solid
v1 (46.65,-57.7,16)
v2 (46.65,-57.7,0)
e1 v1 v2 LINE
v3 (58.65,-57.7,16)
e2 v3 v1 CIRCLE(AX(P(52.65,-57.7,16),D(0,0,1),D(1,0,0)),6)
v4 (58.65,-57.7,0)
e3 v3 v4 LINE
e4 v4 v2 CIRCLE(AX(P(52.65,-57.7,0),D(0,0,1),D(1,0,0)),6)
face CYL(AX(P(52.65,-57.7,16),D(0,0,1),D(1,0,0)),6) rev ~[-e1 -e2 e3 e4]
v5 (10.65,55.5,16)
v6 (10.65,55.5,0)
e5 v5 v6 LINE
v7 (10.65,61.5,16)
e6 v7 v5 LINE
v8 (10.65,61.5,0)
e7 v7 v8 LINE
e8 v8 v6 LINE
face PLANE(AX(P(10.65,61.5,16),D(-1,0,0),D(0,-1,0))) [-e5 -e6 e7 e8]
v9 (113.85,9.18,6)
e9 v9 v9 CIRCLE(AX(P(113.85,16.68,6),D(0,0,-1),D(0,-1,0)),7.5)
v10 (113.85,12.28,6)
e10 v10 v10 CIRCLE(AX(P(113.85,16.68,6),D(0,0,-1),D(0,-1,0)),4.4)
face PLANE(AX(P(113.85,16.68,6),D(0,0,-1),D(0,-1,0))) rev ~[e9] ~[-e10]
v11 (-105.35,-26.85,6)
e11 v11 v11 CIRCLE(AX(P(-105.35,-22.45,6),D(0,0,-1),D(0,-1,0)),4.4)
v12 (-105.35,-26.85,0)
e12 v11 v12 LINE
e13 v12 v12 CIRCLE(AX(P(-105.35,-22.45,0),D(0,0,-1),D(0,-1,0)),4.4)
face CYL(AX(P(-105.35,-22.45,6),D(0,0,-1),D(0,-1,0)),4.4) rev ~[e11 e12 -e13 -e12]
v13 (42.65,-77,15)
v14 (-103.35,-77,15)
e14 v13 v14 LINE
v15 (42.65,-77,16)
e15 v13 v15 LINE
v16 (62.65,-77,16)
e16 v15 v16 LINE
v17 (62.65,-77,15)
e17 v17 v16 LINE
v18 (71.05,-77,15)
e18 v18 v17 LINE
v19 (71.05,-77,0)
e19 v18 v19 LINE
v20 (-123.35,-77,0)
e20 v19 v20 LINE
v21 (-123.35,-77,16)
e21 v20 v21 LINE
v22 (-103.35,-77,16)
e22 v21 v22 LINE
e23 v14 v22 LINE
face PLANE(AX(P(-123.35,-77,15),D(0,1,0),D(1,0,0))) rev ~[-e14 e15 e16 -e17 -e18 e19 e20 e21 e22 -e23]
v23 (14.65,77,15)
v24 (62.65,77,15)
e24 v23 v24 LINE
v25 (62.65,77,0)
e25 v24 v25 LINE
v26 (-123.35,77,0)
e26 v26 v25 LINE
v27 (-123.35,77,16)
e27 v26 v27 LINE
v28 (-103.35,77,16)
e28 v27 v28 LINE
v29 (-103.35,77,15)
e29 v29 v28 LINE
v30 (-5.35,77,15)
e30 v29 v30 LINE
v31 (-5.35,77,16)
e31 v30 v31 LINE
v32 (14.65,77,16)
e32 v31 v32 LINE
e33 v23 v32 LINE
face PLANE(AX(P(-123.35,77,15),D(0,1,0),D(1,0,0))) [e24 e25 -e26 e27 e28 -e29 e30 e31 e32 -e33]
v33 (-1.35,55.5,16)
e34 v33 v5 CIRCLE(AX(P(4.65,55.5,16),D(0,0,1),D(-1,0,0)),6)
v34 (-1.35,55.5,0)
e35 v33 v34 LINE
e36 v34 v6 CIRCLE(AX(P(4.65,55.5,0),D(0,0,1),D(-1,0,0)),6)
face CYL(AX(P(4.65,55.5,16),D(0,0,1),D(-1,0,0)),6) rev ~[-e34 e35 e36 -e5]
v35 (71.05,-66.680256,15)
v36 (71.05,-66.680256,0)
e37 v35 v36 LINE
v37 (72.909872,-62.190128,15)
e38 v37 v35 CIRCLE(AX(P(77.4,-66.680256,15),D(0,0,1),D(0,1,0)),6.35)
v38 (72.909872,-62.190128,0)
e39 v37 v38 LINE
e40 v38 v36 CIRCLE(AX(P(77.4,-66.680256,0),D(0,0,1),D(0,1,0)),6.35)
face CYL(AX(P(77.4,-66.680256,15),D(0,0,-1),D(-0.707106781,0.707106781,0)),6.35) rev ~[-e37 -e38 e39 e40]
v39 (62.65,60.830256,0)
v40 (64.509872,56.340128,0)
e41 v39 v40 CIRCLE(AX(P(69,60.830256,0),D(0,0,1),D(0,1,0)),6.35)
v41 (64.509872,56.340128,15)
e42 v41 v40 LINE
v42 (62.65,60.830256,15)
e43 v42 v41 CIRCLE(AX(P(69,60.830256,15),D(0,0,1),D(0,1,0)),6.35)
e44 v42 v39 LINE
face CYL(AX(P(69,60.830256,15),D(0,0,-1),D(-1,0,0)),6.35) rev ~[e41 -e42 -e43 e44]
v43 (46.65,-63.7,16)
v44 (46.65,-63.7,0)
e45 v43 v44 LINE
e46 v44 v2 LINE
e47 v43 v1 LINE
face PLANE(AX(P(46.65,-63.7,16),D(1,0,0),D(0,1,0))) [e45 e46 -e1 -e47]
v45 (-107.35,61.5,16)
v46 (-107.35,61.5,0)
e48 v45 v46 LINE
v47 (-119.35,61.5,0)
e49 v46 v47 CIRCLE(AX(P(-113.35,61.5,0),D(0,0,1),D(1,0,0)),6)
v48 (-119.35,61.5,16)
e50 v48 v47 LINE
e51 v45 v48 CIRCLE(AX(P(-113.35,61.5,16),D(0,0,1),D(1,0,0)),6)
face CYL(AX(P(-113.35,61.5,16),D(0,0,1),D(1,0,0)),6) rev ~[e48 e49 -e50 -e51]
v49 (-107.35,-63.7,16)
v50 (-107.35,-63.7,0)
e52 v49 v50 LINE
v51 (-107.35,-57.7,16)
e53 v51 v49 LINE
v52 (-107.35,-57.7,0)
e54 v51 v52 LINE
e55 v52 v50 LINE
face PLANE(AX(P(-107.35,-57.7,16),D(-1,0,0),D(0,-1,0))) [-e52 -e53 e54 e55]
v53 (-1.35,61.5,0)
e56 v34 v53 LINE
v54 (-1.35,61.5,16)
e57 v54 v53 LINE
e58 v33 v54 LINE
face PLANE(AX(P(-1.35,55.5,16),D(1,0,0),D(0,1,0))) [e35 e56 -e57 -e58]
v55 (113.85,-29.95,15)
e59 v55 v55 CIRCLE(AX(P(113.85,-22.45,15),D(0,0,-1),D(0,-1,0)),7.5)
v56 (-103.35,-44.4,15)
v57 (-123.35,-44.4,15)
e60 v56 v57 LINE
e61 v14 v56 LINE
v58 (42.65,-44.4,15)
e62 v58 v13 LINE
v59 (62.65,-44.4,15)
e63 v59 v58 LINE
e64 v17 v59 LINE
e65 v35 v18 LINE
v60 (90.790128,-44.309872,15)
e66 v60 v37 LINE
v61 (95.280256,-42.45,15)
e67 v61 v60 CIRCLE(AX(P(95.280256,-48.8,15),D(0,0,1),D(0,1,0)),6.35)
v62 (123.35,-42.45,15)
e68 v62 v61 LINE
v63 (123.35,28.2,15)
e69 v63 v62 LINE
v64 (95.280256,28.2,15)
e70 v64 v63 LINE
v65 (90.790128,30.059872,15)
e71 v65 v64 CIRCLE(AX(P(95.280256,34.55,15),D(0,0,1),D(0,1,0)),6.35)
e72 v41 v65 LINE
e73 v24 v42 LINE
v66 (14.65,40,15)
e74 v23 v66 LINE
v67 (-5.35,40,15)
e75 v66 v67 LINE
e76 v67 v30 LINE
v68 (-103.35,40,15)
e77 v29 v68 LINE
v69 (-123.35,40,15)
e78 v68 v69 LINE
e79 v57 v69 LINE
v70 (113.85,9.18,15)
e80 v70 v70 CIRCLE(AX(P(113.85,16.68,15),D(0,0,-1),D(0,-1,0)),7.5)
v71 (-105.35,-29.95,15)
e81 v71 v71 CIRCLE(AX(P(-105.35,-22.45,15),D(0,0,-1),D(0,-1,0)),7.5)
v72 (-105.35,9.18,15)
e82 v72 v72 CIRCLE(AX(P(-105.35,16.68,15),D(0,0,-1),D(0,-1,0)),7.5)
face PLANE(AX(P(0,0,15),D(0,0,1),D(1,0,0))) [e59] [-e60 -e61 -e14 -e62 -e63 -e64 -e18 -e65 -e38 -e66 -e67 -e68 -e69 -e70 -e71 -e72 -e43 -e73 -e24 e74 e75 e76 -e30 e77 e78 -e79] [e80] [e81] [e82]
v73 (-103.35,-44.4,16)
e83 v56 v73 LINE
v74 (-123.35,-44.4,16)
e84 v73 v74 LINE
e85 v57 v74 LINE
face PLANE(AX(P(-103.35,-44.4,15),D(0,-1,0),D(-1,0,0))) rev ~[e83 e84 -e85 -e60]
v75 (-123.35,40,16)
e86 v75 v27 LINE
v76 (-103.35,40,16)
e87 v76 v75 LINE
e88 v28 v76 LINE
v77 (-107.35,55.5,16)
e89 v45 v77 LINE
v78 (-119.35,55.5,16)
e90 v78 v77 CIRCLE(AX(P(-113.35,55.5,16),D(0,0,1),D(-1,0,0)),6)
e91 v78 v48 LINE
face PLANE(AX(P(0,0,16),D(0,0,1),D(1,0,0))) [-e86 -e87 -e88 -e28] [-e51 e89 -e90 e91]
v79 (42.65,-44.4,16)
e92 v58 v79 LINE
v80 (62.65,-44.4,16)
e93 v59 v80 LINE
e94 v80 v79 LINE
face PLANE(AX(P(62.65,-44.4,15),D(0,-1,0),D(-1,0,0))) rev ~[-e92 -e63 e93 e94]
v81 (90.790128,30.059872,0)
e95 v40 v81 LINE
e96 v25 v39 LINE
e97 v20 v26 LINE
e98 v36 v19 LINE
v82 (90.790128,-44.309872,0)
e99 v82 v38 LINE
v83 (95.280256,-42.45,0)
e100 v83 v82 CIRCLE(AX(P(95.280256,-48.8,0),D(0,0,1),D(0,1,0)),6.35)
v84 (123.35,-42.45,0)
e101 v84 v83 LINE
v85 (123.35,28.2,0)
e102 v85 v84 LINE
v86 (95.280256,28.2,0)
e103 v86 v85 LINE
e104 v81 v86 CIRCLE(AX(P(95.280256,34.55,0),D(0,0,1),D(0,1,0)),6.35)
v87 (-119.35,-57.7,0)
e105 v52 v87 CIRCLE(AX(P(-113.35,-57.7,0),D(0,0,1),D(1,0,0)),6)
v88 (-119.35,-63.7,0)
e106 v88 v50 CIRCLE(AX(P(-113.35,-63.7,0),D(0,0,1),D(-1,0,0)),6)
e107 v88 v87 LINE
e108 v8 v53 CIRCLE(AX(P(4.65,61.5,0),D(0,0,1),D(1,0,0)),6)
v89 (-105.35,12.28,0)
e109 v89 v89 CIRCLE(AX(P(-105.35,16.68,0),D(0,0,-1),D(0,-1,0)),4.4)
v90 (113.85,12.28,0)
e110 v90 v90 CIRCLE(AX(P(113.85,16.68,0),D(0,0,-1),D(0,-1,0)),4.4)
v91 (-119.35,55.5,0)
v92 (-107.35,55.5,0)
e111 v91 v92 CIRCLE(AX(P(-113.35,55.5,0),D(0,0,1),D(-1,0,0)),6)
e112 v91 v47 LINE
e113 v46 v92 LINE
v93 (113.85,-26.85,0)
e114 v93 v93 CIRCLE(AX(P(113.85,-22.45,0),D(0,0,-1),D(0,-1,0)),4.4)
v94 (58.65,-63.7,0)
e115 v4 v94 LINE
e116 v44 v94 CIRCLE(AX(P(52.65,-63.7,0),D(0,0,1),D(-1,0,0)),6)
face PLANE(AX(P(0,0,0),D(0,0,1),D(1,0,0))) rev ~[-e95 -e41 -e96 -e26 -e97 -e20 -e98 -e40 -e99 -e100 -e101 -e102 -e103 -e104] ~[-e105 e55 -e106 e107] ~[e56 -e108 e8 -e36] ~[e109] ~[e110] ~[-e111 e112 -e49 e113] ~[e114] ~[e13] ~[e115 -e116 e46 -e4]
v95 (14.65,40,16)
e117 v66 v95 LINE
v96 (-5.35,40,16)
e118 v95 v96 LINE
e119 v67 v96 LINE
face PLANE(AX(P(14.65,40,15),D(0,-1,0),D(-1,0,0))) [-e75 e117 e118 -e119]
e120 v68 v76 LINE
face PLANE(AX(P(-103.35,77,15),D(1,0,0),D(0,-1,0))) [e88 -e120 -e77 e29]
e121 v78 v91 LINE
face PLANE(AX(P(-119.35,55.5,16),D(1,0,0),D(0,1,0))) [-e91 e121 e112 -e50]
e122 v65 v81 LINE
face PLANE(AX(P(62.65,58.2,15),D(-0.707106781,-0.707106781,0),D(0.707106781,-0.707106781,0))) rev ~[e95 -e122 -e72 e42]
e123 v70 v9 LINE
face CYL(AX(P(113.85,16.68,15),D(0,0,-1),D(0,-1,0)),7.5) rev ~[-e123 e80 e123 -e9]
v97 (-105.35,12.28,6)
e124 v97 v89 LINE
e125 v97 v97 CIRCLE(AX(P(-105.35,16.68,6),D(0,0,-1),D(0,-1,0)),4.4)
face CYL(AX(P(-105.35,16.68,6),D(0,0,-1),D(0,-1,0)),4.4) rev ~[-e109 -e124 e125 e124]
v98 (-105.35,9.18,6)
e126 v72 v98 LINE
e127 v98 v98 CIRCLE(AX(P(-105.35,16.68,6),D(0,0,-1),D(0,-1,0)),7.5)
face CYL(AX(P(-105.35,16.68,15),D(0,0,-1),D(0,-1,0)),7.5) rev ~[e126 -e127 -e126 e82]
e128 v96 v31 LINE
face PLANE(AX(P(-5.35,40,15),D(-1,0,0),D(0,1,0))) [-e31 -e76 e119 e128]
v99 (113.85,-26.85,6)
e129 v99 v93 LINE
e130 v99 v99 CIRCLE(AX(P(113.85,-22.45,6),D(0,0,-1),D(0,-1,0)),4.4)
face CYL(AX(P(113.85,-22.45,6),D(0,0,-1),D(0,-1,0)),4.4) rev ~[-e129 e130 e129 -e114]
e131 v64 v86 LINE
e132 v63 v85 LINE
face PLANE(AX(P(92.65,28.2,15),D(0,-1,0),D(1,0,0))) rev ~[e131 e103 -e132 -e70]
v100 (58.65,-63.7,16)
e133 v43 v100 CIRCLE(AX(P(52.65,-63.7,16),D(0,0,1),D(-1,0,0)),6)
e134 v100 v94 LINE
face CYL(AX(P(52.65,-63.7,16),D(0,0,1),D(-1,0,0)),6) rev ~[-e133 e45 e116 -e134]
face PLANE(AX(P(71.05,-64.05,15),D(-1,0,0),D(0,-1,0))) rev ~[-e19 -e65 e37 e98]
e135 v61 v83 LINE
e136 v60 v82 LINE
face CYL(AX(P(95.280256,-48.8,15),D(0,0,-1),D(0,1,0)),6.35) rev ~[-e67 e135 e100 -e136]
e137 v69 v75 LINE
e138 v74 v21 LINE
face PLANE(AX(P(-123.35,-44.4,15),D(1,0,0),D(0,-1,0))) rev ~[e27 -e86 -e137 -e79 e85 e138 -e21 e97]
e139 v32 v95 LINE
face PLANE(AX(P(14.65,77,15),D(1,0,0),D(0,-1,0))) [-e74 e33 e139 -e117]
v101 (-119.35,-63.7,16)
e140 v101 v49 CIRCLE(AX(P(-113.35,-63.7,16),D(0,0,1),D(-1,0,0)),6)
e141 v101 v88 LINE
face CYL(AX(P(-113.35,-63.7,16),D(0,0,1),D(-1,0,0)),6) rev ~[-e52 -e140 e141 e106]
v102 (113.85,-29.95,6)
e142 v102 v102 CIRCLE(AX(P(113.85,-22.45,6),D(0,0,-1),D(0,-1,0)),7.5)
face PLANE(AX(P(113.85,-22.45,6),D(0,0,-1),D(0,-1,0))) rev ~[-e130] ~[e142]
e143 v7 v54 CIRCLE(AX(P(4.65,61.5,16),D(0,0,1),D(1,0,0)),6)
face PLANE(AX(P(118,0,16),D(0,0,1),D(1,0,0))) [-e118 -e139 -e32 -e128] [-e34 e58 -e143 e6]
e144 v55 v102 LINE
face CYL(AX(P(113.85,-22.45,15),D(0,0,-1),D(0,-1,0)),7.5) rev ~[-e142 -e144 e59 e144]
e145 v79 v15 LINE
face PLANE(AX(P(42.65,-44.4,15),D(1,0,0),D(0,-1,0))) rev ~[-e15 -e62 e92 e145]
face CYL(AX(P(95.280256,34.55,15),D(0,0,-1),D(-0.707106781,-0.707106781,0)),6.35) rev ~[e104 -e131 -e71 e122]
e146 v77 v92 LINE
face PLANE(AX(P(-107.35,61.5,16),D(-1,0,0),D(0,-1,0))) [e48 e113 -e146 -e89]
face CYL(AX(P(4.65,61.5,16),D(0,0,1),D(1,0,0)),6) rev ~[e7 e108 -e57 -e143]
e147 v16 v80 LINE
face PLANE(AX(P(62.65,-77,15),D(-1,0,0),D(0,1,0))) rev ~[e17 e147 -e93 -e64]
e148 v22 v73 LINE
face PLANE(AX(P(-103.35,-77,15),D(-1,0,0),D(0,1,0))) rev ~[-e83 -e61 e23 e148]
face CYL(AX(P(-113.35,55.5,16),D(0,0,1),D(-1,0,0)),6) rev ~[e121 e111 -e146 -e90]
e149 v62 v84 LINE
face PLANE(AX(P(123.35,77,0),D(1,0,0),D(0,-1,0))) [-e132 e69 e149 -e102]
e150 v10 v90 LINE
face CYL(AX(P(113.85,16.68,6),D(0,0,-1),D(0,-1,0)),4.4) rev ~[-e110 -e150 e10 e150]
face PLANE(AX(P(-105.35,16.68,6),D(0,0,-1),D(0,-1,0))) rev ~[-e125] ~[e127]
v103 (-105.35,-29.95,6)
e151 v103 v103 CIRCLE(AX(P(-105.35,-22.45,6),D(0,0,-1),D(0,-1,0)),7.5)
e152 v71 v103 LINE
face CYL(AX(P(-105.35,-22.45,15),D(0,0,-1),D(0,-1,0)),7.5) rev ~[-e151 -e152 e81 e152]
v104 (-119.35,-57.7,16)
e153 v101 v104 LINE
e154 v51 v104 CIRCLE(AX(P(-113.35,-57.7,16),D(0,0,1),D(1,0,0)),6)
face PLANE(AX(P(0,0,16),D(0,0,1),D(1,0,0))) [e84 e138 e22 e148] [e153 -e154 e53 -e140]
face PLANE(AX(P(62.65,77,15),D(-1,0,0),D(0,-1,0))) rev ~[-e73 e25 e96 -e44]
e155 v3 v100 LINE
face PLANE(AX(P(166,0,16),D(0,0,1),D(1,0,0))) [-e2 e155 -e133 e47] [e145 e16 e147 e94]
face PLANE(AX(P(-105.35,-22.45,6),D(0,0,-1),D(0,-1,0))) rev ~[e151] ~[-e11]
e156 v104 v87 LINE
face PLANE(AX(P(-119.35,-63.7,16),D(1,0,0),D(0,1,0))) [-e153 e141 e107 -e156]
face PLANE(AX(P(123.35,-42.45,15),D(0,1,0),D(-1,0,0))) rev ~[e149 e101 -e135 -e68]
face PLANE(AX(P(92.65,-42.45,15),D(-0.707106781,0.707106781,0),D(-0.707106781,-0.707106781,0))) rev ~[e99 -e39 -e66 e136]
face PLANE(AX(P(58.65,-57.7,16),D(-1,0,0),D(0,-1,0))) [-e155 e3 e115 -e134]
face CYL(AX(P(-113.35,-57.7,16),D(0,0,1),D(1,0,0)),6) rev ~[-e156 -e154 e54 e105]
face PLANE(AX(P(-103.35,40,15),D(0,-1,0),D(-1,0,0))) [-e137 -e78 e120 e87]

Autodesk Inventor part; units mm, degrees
ref_plane "YZ Plane" through (0, 0, 0) normal (1, 0, 0) x (0, 1, 0)
ref_plane "XZ Plane" through (0, 0, 0) normal (0, 1, 0) x (-1, 0, 0)
ref_plane "XY Plane" through (0, 0, 0) normal (0, 0, 1) x (1, 0, 0)
sketch "Sketch1" plane through (0, 0, 0) normal (0, 0, 1) x (1, 0, 0)
  line L0 (-123.35, 77) -> (123.35, 77)
  line L1 (123.35, 77) -> (123.35, -77)
  line L2 (123.35, -77) -> (-123.35, -77)
  line L3 (-123.35, -77) -> (-123.35, 77)
  point P0 (0, 0)
  point P1 (-123.35, 0)
  point P2 (0, 77)
  dimension "d0" = 246.7
  dimension "d1" = 154
extrude "Extrusion1" add sketch "Sketch1" along normal blind 15
sketch "Sketch2" plane through (0, 0, 15) normal (0, 0, 1) x (1, 0, 0)
  line L0 (-123.35, 77) -> (123.35, 77) projected
  line L1 (123.35, 77) -> (123.35, -77) projected
  line L2 (62.65, 77) -> (62.65, 28.2)
  line L3 (62.65, 28.2) -> (123.35, 28.2)
  line L4 (123.35, -77) -> (-123.35, -77) projected
  line L5 (62.65, 58.2) -> (92.65, 28.2)
  dimension "d4" = 60.7
  dimension "d5" = 105.2
  dimension "d6" = 45
  dimension "d7" = 30.7
extrude "Extrusion2" cut sketch "Sketch2" against normal through all contours L0 L1 L3 L5 L2
sketch "Sketch3" plane through (0, 0, 15) normal (0, 0, 1) x (1, 0, 0)
  line L0 (123.35, 28.2) -> (123.35, -77) projected
  line L1 (123.35, -42.45) -> (92.65, -42.45)
  line L2 (92.65, -42.45) -> (71.05, -64.05)
  line L3 (71.05, -64.05) -> (71.05, -77)
  line L4 (123.35, -77) -> (-123.35, -77) projected
  point P0 (92.65, 28.2)
  point P1 (62.65, 58.2)
  dimension "d10" = 34.55
  dimension "d11" = 45
  dimension "d41" = 52.3
extrude "Extrusion3" cut sketch "Sketch3" against normal through all
fillet "Fillet1" radius 6.35 4 edges at (62.65, 58.2, 7.5) (92.65, 28.2, 7.5) (92.65, -42.45, 7.5) (71.05, -64.05, 7.5)
sketch "Sketch4" plane through (0, 0, 15) normal (0, 0, 1) x (1, 0, 0)
  line L0 (-123.35, 77) -> (-103.35, 77)
  line L1 (-103.35, 77) -> (-103.35, 40)
  line L2 (-103.35, 40) -> (-123.35, 40)
  line L3 (-123.35, 40) -> (-123.35, 77)
  dimension "d15" = 37
  dimension "d16" = 20
extrude "Extrusion4" add sketch "Sketch4" along normal blind 1
sketch "Sketch5" plane through (0, 0, 16) normal (0, 0, 1) x (1, 0, 0)
  line L0 (-119.35, 55.5) -> (-119.35, 61.5)
  arc A0 (-107.35, 61.5) -> (-119.35, 61.5) centre (-113.35, 61.5) ccw
  line L1 (-107.35, 61.5) -> (-107.35, 55.5)
  arc A1 (-119.35, 55.5) -> (-107.35, 55.5) centre (-113.35, 55.5) ccw
  line L2 (-119.35, 58.5) -> (-107.35, 58.5) construction
  line L3 (-103.35, 77) -> (-103.35, 40) construction
  line L4 (-103.35, 40) -> (-123.35, 40) construction
  point P0 (-103.35, 58.5)
  point P1 (-113.35, 40)
  point P2 (-113.35, 58.5)
  dimension "d23" = 12
  dimension "d24" = 18
extrude "Extrusion5" cut sketch "Sketch5" against normal through all
pattern_linear "Rectangular Pattern1" count 2 spacing 118 along (1, 0, 0) of "Extrusion4", "Extrusion5"
sketch "Sketch6" plane through (0, 0, 15) normal (0, 0, 1) x (1, 0, 0)
  line L0 (-123.35, -77) -> (-103.35, -77)
  line L1 (-103.35, -77) -> (-103.35, -44.4)
  line L2 (-103.35, -44.4) -> (-123.35, -44.4)
  line L3 (-123.35, -44.4) -> (-123.35, -77)
  point P0 (-103.35, 40)
  dimension "d30" = 32.6
extrude "Extrusion6" add sketch "Sketch6" along normal blind 1
sketch "Sketch7" plane through (0, -119.2, 16) normal (0, 0, 1) x (1, 0, 0)
  line L0 (-119.35, 55.5) -> (-119.35, 61.5)
  arc A0 (-107.35, 61.5) -> (-119.35, 61.5) centre (-113.35, 61.5) ccw
  line L1 (-107.35, 61.5) -> (-107.35, 55.5)
  arc A1 (-119.35, 55.5) -> (-107.35, 55.5) centre (-113.35, 55.5) ccw
  line L2 (-119.35, 58.5) -> (-107.35, 58.5) construction
  line L3 (-103.35, 77) -> (-103.35, 40) construction
  line L4 (-103.35, 40) -> (-123.35, 40) construction
  point P0 (-103.35, 58.5)
  point P1 (-113.35, 40)
  point P2 (-113.35, 58.5)
  dimension "d34" = 12
  dimension "d33" = 18
extrude "Extrusion7" cut sketch "Sketch7" against normal through all
pattern_linear "Rectangular Pattern2" count 2 spacing 166 along (1, 0, 0) of "Extrusion7", "Extrusion6"
hole "Hole1" at (-105.35, -22.45, 15) direction (0, 0, -1) diameter 8.8 end through all counterbore diameter 15 counterbore depth 9
pattern_linear "Rectangular Pattern3" count 2 spacing 39.13 along (0, 1, 0) count 2 spacing 219.2 along (1, 0, 0) of "Hole1"
properties part number "VERTICAL PLATE" material "Steel, Mild"
